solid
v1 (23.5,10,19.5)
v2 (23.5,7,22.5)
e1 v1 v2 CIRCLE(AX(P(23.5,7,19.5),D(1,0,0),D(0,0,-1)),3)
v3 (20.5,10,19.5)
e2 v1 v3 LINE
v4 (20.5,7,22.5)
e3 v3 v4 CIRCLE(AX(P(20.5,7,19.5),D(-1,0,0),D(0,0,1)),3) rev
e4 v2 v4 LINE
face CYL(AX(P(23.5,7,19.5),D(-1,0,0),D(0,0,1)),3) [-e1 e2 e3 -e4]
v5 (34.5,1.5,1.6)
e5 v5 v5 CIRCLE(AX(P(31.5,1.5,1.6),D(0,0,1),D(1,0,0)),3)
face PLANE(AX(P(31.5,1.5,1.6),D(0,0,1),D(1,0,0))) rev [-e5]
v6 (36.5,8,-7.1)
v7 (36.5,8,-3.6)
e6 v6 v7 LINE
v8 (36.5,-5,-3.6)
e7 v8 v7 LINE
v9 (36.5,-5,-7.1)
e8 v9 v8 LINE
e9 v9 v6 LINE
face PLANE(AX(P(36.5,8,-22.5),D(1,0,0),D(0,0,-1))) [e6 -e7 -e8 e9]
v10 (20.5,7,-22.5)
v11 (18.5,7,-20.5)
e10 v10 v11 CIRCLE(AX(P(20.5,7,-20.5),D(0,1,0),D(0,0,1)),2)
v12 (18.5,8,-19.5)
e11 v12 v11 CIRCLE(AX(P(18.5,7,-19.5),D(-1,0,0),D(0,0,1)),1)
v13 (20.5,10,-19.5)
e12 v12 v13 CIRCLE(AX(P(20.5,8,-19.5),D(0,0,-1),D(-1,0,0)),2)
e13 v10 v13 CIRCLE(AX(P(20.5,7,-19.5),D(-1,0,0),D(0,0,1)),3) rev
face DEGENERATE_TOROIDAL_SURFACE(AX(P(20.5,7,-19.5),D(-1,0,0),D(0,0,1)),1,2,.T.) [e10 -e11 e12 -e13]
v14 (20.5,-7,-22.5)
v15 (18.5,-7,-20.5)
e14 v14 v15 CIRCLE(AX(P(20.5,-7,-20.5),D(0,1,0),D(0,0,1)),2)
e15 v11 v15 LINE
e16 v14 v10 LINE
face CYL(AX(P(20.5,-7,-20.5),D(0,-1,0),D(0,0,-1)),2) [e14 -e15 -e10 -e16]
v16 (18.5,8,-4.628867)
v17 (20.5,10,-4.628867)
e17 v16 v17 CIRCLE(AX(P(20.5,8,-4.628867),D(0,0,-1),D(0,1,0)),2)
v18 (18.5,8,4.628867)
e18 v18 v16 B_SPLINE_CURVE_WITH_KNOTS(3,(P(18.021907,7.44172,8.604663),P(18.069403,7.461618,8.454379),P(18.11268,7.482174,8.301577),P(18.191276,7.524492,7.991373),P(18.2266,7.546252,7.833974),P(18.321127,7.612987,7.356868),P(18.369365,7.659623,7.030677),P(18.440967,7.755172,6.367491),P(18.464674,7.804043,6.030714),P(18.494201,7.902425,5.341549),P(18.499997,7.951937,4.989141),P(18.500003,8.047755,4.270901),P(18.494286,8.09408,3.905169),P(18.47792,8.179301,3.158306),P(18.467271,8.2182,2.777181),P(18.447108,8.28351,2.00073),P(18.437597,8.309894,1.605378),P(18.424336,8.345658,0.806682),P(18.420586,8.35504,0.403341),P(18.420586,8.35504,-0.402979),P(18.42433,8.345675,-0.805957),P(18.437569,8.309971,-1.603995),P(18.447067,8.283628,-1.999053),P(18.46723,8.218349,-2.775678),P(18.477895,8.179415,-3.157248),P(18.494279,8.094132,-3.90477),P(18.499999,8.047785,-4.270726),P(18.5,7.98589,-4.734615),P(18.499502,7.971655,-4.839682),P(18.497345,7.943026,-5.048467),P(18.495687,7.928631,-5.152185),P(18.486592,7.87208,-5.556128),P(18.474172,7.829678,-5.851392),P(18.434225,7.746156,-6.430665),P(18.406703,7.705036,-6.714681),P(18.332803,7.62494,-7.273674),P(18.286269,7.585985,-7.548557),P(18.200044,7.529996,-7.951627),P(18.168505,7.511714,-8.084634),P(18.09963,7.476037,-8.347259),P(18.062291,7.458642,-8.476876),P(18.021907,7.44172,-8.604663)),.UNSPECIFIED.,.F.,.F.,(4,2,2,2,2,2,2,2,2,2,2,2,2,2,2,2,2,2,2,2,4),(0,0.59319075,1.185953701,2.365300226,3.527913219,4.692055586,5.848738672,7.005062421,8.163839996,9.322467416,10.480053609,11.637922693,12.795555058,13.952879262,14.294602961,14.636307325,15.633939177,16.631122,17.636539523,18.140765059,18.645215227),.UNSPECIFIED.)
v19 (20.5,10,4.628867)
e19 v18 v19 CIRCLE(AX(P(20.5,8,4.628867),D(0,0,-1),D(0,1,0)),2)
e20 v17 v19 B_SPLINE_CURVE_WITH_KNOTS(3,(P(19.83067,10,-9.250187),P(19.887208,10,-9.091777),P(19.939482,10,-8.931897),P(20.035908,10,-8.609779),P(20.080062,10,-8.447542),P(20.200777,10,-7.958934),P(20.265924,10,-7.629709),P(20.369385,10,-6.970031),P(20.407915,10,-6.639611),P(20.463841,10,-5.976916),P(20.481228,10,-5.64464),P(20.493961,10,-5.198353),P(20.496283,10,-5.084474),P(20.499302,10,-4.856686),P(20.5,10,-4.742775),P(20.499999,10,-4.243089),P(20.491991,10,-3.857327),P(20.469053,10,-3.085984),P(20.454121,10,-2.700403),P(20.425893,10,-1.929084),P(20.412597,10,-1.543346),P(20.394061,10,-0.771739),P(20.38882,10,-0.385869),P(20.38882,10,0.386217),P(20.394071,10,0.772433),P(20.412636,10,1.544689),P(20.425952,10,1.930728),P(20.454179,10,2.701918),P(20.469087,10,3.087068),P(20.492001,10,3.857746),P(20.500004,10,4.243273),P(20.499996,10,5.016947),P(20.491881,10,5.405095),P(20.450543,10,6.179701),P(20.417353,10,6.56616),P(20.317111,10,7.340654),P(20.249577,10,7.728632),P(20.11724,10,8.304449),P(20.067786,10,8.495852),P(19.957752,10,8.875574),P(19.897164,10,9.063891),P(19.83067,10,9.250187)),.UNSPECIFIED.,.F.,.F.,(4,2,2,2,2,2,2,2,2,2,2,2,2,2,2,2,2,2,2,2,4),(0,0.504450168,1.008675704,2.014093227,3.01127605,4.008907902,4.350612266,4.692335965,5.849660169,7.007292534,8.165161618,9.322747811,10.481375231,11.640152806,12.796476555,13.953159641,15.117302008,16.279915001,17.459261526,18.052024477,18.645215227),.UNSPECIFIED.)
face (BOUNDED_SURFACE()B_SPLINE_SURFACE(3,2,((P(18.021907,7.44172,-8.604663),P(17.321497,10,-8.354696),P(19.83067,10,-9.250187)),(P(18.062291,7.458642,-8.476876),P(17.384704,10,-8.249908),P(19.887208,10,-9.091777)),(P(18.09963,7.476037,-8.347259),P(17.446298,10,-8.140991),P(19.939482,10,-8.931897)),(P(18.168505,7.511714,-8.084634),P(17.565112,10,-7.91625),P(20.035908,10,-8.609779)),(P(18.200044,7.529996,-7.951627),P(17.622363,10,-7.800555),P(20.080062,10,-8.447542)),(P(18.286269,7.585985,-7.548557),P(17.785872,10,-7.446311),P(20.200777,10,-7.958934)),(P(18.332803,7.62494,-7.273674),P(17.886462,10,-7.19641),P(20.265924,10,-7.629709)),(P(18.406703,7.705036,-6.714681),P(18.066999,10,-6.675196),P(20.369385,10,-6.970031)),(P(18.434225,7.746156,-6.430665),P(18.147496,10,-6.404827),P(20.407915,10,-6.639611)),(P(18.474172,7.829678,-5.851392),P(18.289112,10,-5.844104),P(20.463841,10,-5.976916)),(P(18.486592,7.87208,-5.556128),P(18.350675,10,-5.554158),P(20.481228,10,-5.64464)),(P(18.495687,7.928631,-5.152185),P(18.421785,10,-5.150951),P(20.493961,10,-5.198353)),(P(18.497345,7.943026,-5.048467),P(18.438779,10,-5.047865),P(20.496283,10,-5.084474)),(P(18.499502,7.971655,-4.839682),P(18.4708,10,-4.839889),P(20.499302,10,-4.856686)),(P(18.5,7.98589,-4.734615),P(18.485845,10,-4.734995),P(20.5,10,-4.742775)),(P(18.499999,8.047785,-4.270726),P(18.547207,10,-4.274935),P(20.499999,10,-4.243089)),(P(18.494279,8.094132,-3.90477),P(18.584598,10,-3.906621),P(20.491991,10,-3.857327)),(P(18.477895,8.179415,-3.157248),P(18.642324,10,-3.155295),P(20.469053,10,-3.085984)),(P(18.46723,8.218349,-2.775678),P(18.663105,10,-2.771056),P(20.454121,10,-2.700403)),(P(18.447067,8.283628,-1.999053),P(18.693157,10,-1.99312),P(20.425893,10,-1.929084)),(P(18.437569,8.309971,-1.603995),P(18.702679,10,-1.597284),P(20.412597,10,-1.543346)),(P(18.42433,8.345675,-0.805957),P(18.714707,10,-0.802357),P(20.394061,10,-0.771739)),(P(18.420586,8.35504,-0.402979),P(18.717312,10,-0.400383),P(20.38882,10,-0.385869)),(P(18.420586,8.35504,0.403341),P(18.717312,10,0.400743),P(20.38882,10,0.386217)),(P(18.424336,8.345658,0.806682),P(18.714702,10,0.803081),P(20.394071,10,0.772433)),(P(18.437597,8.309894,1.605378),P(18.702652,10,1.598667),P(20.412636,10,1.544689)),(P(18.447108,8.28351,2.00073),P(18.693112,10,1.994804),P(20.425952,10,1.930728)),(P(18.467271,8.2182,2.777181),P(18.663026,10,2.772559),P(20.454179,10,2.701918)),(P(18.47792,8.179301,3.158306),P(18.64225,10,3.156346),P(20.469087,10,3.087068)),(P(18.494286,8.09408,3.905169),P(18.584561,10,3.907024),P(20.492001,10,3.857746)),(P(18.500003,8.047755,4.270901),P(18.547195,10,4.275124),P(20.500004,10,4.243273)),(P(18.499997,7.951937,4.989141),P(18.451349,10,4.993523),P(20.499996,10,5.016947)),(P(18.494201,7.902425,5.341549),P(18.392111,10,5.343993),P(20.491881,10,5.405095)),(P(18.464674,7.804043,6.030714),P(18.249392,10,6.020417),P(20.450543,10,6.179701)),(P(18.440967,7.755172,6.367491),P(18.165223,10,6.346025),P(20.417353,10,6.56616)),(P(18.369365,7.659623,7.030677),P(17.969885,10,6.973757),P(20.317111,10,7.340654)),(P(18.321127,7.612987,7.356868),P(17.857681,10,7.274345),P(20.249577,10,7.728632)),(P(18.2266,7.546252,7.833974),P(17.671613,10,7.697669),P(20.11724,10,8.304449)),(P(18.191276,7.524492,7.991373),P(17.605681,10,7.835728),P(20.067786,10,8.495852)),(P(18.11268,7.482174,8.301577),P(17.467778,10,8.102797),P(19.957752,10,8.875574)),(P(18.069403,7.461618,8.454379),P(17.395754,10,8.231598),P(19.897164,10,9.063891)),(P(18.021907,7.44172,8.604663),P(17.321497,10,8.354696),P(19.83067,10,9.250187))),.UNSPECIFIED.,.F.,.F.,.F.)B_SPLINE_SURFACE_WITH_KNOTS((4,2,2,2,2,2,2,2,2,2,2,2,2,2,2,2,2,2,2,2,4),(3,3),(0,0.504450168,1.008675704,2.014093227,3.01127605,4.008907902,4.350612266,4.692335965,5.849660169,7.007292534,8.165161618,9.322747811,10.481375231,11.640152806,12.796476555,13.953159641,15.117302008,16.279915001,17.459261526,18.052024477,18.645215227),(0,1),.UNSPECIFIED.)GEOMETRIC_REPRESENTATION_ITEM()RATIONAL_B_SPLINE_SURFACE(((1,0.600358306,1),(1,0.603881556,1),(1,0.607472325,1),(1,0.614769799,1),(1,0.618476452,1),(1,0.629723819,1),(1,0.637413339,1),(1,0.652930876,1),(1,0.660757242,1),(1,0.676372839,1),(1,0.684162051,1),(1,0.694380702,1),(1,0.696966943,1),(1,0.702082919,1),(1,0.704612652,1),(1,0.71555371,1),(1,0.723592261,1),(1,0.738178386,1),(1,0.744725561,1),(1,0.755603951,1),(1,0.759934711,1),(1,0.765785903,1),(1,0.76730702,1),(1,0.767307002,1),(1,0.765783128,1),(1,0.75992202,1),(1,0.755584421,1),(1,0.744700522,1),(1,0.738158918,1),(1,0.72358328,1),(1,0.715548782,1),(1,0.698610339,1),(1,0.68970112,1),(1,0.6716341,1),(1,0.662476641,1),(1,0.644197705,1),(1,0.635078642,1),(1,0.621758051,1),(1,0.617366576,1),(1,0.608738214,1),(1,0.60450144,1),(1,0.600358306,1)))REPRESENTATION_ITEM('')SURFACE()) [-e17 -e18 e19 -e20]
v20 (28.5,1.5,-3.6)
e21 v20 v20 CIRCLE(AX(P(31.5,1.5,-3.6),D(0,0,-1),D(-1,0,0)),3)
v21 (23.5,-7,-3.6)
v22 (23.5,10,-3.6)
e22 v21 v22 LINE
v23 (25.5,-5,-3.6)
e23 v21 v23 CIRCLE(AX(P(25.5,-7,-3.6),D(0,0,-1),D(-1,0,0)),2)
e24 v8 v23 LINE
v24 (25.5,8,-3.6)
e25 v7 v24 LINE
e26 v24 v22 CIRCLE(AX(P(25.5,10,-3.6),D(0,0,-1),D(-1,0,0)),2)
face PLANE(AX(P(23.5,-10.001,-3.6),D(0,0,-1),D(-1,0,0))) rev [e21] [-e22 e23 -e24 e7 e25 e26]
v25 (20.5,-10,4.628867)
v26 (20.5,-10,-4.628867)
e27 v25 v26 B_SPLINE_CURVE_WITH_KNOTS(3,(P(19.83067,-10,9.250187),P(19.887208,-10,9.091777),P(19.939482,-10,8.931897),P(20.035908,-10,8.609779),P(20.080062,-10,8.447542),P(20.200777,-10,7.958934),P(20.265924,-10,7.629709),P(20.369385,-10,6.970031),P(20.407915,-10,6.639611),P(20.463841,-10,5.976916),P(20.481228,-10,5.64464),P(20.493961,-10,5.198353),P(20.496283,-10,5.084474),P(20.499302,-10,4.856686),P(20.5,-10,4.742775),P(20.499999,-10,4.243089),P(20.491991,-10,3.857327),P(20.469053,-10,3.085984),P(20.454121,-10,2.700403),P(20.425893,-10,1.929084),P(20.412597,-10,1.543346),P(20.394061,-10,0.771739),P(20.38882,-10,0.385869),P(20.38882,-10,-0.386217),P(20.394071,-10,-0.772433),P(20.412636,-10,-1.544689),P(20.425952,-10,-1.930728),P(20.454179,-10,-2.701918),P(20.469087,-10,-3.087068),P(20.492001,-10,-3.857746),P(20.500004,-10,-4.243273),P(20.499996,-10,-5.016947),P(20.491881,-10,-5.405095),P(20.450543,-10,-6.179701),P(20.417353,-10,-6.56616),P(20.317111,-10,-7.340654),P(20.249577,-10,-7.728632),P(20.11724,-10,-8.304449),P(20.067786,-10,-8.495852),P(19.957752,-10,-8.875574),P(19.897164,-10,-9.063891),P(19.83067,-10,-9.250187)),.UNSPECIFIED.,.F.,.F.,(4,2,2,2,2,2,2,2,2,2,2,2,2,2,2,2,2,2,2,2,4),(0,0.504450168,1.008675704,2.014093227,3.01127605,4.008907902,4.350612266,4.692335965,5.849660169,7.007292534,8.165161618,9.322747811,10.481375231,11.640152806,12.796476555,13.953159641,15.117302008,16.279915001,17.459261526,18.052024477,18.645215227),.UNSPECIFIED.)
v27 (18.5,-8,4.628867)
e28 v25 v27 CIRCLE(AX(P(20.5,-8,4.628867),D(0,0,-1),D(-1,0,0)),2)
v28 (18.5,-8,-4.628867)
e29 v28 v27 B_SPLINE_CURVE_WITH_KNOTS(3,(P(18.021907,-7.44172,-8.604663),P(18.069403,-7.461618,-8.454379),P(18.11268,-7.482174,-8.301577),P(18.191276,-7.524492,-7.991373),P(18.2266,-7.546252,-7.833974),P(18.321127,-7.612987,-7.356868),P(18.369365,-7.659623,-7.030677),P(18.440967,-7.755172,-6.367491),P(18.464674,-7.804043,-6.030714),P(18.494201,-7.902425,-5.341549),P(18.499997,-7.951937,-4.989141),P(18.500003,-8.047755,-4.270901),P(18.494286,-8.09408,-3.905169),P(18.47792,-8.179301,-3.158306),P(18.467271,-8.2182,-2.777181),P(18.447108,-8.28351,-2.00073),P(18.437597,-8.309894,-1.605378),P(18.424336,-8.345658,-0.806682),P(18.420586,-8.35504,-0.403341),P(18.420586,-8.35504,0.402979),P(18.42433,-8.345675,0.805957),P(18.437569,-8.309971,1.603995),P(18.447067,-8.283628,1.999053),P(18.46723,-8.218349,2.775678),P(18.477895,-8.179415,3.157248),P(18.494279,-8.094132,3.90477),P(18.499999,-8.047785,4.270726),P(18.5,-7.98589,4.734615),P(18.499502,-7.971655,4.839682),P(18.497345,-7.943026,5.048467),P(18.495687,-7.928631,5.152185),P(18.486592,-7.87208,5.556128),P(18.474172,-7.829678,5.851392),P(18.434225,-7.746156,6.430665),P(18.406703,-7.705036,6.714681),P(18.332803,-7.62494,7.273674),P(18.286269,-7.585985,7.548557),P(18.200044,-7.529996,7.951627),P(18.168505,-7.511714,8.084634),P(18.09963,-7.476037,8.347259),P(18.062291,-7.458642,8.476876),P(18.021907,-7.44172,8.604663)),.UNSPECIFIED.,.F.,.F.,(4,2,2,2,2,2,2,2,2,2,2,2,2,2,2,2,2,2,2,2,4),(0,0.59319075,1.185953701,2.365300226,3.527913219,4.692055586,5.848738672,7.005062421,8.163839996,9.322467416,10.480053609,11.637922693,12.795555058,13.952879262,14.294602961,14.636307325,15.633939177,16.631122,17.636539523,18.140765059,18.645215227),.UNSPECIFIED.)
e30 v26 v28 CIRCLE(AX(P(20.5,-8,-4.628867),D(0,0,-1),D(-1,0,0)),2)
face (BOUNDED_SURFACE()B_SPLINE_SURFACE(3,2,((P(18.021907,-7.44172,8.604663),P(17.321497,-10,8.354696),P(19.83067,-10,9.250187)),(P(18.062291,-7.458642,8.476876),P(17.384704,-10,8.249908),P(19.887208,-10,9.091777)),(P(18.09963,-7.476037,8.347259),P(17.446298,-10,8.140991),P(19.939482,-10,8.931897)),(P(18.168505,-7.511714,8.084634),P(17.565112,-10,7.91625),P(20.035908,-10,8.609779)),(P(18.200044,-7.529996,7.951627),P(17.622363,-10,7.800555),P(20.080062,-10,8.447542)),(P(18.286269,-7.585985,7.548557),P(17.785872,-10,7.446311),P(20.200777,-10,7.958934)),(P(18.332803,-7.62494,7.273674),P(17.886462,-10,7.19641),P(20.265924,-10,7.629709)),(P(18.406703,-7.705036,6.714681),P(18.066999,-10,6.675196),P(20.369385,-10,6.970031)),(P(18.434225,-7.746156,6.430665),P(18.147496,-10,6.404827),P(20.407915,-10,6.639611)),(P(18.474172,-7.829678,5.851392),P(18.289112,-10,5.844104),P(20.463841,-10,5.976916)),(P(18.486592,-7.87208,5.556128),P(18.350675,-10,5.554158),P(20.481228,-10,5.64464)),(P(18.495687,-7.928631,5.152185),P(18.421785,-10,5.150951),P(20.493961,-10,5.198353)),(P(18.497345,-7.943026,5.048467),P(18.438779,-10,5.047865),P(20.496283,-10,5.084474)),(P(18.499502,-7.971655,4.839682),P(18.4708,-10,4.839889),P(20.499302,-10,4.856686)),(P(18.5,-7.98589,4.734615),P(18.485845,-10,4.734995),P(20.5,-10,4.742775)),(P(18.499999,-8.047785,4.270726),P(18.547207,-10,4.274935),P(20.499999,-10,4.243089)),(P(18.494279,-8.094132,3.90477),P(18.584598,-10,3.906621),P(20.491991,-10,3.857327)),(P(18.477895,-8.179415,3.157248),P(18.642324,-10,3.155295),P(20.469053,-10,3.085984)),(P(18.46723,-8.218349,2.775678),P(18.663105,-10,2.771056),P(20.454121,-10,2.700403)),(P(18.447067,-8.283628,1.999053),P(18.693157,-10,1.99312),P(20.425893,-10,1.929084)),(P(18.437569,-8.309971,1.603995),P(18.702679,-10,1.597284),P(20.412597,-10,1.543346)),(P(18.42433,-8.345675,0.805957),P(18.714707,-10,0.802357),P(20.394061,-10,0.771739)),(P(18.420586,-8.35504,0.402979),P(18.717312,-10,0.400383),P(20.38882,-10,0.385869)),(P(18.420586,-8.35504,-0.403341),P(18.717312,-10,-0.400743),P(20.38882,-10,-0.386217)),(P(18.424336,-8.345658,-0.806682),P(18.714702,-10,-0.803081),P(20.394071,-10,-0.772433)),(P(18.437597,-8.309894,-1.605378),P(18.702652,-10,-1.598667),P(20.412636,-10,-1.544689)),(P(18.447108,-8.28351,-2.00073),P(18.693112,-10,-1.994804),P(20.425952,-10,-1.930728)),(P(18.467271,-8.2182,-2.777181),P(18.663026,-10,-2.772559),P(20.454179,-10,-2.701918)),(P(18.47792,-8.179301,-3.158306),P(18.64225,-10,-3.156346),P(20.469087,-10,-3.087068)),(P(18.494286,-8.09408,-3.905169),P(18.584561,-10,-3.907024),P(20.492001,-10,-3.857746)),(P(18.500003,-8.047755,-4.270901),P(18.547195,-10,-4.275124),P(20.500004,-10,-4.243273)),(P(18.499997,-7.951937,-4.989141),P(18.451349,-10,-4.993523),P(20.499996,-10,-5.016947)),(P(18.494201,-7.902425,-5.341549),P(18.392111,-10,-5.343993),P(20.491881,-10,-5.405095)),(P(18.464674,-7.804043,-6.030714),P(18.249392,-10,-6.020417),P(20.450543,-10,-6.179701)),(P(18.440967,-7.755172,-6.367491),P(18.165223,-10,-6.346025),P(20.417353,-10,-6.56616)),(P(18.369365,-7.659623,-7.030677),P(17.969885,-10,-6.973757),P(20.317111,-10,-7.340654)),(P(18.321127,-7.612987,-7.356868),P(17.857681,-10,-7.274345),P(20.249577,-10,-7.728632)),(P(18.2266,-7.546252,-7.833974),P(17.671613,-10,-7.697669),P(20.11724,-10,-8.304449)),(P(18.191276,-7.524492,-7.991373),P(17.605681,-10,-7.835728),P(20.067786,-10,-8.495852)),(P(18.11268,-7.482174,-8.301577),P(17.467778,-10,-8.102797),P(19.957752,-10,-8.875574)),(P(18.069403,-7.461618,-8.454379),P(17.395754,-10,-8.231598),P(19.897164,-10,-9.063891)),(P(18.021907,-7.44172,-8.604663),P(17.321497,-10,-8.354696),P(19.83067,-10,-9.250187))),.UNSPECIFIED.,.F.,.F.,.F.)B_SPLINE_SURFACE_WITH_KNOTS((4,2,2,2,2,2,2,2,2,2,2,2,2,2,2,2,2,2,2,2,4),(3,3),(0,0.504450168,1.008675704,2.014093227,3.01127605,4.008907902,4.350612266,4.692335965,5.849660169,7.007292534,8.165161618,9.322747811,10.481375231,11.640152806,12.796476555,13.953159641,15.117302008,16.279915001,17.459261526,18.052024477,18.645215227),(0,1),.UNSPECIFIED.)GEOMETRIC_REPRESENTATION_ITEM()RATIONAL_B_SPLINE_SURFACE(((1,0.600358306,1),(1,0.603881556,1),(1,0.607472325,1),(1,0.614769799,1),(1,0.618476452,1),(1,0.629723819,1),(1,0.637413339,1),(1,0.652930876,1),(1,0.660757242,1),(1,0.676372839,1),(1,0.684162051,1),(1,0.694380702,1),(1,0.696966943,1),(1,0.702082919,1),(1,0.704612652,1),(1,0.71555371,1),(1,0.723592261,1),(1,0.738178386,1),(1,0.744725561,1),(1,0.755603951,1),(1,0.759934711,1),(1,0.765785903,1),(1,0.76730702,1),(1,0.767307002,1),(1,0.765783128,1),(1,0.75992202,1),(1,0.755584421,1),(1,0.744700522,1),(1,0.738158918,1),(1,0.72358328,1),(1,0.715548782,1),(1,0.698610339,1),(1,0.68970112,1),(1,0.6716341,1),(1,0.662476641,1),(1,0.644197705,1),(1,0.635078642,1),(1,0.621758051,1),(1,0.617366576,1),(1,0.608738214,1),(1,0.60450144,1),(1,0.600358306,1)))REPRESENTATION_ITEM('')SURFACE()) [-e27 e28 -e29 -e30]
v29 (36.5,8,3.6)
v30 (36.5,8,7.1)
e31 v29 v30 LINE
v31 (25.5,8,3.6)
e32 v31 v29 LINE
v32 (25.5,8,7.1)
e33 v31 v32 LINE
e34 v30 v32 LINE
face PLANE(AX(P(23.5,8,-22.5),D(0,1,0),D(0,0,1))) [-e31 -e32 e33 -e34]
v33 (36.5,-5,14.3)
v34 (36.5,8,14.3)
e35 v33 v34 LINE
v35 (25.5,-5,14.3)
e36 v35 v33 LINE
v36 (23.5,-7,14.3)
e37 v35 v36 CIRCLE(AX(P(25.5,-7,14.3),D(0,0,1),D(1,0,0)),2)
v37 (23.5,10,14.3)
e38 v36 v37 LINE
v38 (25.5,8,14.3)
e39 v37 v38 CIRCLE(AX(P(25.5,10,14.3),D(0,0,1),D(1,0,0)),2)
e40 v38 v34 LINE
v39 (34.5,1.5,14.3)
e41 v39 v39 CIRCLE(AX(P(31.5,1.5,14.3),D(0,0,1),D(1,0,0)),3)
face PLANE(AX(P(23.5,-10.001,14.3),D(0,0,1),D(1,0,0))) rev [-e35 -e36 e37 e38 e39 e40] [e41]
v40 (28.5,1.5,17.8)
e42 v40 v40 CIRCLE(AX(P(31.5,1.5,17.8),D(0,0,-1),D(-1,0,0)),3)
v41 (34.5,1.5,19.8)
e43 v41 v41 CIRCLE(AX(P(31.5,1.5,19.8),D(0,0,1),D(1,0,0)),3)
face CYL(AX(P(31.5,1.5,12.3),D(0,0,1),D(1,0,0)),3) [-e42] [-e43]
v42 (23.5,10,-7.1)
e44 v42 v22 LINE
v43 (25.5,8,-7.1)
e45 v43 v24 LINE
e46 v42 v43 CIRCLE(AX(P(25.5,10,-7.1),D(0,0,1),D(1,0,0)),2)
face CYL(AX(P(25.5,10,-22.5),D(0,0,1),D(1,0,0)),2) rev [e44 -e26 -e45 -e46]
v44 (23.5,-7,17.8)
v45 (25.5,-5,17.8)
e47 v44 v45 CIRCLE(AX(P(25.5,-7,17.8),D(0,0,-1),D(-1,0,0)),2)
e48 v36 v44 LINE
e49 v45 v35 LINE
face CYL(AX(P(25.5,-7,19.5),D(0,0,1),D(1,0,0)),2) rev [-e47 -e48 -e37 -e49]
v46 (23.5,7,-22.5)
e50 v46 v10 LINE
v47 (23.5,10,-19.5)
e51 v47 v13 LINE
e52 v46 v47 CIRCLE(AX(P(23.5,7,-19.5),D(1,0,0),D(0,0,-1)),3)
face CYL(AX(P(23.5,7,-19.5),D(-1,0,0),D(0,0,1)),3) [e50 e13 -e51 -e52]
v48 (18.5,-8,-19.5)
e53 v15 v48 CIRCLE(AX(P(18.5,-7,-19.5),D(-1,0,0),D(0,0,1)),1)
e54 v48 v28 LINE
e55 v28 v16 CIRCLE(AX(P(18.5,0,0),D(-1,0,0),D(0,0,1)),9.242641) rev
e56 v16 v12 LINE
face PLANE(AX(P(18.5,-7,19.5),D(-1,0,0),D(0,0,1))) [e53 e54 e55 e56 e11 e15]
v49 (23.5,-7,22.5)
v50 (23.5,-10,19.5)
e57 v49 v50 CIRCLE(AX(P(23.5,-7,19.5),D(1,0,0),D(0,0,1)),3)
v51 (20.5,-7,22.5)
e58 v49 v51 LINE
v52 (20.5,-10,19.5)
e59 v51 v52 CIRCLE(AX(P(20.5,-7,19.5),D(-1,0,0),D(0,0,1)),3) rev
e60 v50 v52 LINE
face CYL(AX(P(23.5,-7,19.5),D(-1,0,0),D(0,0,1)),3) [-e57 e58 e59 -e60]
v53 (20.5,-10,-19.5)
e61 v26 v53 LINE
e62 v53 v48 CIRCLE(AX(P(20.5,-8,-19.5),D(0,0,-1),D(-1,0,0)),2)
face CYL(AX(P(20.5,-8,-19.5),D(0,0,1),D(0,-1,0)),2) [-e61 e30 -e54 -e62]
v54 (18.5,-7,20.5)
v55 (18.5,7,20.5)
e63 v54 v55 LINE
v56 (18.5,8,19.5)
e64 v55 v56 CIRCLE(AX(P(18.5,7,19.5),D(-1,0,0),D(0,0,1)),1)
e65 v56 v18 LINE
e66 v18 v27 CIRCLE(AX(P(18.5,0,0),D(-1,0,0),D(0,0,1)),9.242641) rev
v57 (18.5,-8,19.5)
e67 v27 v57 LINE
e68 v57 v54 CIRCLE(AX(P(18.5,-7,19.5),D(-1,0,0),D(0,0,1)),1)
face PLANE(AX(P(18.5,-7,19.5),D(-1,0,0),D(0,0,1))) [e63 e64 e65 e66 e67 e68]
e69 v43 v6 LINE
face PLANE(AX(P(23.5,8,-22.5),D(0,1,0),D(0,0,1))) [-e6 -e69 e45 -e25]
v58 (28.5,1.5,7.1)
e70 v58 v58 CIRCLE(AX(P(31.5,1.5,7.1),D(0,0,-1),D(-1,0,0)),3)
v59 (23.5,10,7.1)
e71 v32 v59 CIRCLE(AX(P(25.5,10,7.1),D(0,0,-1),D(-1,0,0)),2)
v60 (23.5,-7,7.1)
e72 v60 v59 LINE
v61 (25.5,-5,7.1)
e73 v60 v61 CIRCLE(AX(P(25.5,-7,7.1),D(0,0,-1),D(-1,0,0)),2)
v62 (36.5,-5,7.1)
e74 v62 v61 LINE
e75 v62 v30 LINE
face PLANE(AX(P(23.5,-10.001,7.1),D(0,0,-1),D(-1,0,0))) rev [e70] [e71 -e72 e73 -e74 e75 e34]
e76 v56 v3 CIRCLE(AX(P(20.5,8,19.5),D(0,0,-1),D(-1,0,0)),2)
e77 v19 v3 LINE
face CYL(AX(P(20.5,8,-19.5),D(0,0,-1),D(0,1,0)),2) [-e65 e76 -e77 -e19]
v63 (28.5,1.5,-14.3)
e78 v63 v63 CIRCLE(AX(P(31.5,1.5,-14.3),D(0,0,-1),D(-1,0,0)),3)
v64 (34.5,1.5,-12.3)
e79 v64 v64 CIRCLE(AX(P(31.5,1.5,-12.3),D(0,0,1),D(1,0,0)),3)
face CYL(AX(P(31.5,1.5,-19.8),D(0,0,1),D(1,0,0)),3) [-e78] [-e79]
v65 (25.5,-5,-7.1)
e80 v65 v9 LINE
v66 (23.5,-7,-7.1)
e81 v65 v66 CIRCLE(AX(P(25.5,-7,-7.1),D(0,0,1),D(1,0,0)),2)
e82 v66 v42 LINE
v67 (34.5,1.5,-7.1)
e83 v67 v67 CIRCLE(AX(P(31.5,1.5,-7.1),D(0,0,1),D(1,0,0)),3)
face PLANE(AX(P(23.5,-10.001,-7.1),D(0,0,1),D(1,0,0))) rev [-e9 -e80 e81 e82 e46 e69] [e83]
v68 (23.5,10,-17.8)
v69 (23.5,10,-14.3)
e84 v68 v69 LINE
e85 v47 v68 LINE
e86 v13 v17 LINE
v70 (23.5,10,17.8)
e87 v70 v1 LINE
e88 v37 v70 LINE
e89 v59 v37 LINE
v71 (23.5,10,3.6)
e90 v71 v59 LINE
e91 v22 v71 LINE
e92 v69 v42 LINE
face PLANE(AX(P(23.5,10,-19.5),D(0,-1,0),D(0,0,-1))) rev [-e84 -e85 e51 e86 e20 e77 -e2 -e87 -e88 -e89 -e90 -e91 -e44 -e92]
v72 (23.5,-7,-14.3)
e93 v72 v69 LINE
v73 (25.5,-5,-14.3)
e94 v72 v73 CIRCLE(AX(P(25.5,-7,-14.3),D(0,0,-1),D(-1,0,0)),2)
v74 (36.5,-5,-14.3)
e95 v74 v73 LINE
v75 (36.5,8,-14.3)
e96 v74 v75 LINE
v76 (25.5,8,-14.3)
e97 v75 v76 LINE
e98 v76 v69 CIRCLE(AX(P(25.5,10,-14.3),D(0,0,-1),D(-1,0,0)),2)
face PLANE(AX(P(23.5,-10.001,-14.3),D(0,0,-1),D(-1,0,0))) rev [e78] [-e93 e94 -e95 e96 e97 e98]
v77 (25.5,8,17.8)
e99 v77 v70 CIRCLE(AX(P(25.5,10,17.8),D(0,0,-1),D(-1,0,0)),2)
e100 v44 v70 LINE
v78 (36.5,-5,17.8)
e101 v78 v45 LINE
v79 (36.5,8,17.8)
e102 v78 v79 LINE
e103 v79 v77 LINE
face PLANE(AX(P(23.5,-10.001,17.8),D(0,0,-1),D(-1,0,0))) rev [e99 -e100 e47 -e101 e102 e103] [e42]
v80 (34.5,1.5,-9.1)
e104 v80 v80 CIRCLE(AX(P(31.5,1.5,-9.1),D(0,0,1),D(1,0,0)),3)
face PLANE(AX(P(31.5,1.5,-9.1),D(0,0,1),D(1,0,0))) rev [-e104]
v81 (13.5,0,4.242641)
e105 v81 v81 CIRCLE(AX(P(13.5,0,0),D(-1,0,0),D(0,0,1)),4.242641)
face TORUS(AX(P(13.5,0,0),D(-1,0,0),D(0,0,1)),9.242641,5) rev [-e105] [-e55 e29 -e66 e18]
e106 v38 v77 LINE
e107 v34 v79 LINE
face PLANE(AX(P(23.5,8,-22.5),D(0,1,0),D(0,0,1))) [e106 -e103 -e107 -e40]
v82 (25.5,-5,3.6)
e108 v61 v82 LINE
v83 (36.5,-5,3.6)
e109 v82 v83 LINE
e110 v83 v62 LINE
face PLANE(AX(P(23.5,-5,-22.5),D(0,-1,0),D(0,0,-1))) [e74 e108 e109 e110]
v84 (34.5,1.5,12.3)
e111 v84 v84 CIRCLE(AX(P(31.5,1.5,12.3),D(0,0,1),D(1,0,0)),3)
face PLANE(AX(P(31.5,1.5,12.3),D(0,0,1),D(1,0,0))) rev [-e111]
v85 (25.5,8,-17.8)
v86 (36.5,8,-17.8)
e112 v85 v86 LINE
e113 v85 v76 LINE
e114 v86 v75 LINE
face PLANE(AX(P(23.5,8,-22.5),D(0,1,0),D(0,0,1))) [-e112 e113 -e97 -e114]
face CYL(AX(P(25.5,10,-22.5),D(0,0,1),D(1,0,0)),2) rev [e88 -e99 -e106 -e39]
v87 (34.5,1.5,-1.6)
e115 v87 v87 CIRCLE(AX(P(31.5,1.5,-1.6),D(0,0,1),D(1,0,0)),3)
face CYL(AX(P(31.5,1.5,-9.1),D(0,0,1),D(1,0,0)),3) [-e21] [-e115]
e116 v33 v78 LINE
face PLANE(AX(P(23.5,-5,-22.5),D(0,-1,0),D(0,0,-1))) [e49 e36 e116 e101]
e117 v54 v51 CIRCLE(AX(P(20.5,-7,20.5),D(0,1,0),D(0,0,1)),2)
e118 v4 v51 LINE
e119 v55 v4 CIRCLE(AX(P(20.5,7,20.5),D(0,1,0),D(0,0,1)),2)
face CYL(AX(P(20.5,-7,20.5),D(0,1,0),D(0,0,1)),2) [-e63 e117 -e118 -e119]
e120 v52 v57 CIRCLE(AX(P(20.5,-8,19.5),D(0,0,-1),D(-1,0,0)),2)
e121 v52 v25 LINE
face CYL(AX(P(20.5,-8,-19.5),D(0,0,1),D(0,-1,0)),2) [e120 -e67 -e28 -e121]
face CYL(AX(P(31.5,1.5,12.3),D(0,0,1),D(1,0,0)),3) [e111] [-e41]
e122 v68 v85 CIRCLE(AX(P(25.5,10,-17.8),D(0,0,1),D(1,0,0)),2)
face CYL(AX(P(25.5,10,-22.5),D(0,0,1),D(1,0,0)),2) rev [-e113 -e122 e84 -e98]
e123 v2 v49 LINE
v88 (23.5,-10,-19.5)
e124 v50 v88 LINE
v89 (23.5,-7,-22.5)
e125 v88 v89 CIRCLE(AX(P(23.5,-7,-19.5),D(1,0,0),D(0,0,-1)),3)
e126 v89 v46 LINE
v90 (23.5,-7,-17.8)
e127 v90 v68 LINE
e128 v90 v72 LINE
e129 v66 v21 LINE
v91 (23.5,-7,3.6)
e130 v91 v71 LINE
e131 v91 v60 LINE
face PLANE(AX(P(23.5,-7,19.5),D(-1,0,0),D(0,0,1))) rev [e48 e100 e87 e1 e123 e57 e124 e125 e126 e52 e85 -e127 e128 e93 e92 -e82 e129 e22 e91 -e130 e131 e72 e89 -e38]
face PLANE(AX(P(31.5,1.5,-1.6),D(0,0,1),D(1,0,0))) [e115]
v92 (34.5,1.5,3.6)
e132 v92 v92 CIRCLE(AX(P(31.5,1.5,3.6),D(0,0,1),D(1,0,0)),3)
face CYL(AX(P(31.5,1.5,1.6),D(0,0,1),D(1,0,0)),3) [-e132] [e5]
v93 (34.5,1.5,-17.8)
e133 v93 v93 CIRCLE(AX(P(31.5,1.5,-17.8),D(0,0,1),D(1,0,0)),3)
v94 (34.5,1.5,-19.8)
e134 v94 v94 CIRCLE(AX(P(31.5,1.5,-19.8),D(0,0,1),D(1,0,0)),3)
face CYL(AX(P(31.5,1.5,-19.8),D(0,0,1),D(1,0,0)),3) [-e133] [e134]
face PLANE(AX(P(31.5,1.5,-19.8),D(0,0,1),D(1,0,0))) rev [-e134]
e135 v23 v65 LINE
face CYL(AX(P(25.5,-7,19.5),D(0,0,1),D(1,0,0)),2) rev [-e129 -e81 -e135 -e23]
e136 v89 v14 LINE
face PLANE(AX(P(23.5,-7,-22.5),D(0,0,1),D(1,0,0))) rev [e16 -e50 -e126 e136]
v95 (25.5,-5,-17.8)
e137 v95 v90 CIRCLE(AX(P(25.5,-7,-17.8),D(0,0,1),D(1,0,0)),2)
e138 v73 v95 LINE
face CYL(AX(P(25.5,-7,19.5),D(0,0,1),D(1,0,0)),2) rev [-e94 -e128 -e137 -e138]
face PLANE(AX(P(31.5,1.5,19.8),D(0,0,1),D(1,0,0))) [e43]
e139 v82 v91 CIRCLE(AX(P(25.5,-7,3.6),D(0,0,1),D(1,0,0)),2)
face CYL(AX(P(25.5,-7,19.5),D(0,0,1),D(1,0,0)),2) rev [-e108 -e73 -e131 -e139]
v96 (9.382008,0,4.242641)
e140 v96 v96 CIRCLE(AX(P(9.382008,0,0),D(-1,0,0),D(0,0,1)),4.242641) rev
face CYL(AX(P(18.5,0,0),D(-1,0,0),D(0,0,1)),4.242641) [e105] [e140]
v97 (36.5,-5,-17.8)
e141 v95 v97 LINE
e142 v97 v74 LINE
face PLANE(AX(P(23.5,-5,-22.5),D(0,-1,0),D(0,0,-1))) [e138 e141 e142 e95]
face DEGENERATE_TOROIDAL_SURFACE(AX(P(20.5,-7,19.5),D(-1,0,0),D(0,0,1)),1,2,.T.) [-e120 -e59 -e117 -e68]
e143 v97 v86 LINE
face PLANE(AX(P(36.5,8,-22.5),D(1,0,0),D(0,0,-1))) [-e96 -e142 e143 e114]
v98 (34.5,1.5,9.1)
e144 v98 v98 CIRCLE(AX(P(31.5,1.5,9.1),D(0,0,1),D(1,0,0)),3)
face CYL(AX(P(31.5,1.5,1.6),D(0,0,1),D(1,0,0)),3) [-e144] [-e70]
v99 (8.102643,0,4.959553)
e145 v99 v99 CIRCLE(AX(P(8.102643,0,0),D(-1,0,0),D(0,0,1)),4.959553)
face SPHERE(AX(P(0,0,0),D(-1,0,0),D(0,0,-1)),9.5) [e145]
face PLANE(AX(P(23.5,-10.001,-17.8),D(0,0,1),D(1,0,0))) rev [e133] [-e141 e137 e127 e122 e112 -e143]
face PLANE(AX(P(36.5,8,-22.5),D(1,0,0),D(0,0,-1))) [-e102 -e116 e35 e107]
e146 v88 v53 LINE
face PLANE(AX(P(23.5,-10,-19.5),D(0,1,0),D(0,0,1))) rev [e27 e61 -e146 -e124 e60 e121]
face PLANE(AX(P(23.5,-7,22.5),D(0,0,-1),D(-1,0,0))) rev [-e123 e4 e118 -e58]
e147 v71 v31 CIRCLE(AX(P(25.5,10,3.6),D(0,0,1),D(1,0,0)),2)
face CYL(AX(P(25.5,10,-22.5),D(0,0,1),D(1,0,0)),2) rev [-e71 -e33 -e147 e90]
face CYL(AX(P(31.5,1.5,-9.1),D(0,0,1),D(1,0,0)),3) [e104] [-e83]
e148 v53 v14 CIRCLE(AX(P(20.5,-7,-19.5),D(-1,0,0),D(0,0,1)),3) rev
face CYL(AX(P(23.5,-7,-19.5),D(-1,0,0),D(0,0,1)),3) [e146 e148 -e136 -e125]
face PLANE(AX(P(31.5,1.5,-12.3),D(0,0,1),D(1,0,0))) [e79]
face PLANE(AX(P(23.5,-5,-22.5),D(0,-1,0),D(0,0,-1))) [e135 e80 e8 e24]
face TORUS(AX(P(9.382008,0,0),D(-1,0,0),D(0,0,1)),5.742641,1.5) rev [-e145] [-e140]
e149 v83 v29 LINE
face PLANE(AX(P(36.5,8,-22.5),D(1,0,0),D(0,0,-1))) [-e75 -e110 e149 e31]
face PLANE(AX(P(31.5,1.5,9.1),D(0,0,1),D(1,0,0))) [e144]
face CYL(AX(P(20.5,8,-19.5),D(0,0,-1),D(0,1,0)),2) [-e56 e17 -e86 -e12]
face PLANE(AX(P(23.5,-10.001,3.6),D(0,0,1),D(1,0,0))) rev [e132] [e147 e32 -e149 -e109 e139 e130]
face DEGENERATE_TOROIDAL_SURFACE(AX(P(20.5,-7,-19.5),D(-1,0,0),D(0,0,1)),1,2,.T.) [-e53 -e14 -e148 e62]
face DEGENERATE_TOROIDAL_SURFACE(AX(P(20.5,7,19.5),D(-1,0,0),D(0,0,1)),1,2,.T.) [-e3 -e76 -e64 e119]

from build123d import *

# Parameters (mm, degrees)
SKETCH3_R                = 4.242640687
BOSS_EXTRUDE1_DEPTH      = 10
FILLET1_R                = 1.5
BOSS_EXTRUDE2_DEPTH      = 5
FILLET2_R                = 5
SKETCH5_W                = 13
SKETCH5_H                = 13
BOSS_EXTRUDE3_DEPTH      = 45
CUT_EXTRUDE4_REACH       = 48.503
SKETCH6_W                = 13
SKETCH6_H                = 4.7
SKETCH6_H_2              = 7.2
BOSS_EXTRUDE4_DEPTH      = 2
BOSS_EXTRUDE4_DEPTH_BACK = 5.5
SKETCH9_R                = 3
BOSS_EXTRUDE5_DEPTH      = 2
BOSS_EXTRUDE5_DEPTH_BACK = 5.5
SKETCH10_R               = 3
BOSS_EXTRUDE6_DEPTH      = 2
BOSS_EXTRUDE6_DEPTH_BACK = 5.5
SKETCH12_R               = 3
BOSS_EXTRUDE7_DEPTH      = 2
BOSS_EXTRUDE7_DEPTH_BACK = 5.5
SKETCH14_R               = 3
FILLET4_R                = 2
FILLET8_R                = 2


with BuildPart() as part:
    # Sketch1 → Revolve1 (revolve)
    with BuildSketch(Plane(origin=(0, 0, 0), x_dir=(1, 0, 0), z_dir=(0, 1, 0))):
        with BuildLine():
            Line((-9.5, 0), (8.5, 0))
            Line((8.5, 0), (8.5, 4.242640687))
            ThreePointArc((8.5, 4.242640687), (-2.179449472, 9.246621004), (-9.5, 0))
        make_face()
    revolve(axis=Axis((-9.5, 0, 0), (1, 0, 0)))

    # Sketch3 → Boss-Extrude1 (add)
    with BuildSketch(Plane(origin=(8.5, 0, 0), x_dir=(0, 0, -1), z_dir=(1, 0, 0))):
        Circle(SKETCH3_R)
    extrude(amount=BOSS_EXTRUDE1_DEPTH)

    # Fillet1
    fillet1_edges = [part.edges().sort_by_distance(p)[0] for p in [
        (8.5, 0, 4.242640687),
    ]]
    fillet(fillet1_edges, radius=FILLET1_R)

    # Sketch4 → Boss-Extrude2 (add)
    with BuildSketch(Plane(origin=(18.5, 0, 0), x_dir=(0, 0, -1), z_dir=(1, 0, 0))):
        with BuildLine():
            Line((19.5, -10), (-19.5, -10))
            ThreePointArc((-19.5, -10), (-21.621320344, -9.121320344), (-22.5, -7))
            Line((-22.5, -7), (-22.5, 7))
            ThreePointArc((-22.5, 7), (-21.621320344, 9.121320344), (-19.5, 10))
            Line((-19.5, 10), (19.5, 10))
            ThreePointArc((19.5, 10), (21.621320344, 9.121320344), (22.5, 7))
            Line((22.5, 7), (22.5, -7))
            ThreePointArc((22.5, -7), (21.621320344, -9.121320344), (19.5, -10))
        make_face()
    extrude(amount=BOSS_EXTRUDE2_DEPTH)

    # Fillet2
    fillet2_edges = [part.edges().sort_by_distance(p)[0] for p in [
        (18.5, 0, 4.242640687),
    ]]
    fillet(fillet2_edges, radius=FILLET2_R)

    # Sketch5 → Boss-Extrude3 (add, through all)
    with BuildSketch(Plane.XY.offset(22.5)):
        with Locations((30, 1.5)):
            Rectangle(SKETCH5_W, SKETCH5_H)
    extrude(amount=-BOSS_EXTRUDE3_DEPTH)

    # Sketch6 → Cut-Extrude4 (cut, up to next)
    with BuildSketch(Plane(origin=(0, 8, 0), x_dir=(1, 0, 0), z_dir=(0, 1, 0)), mode=Mode.PRIVATE) as cut_extrude4_sk1:
        with Locations((30, -20.15)):
            Rectangle(SKETCH6_W, SKETCH6_H)
    cut_extrude4_tool1 = extrude(cut_extrude4_sk1.sketch, amount=-CUT_EXTRUDE4_REACH, mode=Mode.PRIVATE) & part.part
    # Sketch6 → Cut-Extrude4 (cut, up to next)
    with BuildSketch(Plane(origin=(0, 8, 0), x_dir=(1, 0, 0), z_dir=(0, 1, 0)), mode=Mode.PRIVATE) as cut_extrude4_sk2:
        with Locations((30, -10.7)):
            Rectangle(SKETCH6_W, SKETCH6_H_2)
    cut_extrude4_tool2 = extrude(cut_extrude4_sk2.sketch, amount=-CUT_EXTRUDE4_REACH, mode=Mode.PRIVATE) & part.part
    # Sketch6 → Cut-Extrude4 (cut, up to next)
    with BuildSketch(Plane(origin=(0, 8, 0), x_dir=(1, 0, 0), z_dir=(0, 1, 0)), mode=Mode.PRIVATE) as cut_extrude4_sk3:
        with Locations((30, 0)):
            Rectangle(SKETCH6_W, SKETCH6_H_2)
    cut_extrude4_tool3 = extrude(cut_extrude4_sk3.sketch, amount=-CUT_EXTRUDE4_REACH, mode=Mode.PRIVATE) & part.part
    # Sketch6 → Cut-Extrude4 (cut, up to next)
    with BuildSketch(Plane(origin=(0, 8, 0), x_dir=(1, 0, 0), z_dir=(0, 1, 0)), mode=Mode.PRIVATE) as cut_extrude4_sk4:
        with Locations((30, 10.7)):
            Rectangle(SKETCH6_W, SKETCH6_H_2)
    cut_extrude4_tool4 = extrude(cut_extrude4_sk4.sketch, amount=-CUT_EXTRUDE4_REACH, mode=Mode.PRIVATE) & part.part
    # Sketch6 → Cut-Extrude4 (cut, up to next)
    with BuildSketch(Plane(origin=(0, 8, 0), x_dir=(1, 0, 0), z_dir=(0, 1, 0)), mode=Mode.PRIVATE) as cut_extrude4_sk5:
        with Locations((30, 20.15)):
            Rectangle(SKETCH6_W, SKETCH6_H)
    cut_extrude4_tool5 = extrude(cut_extrude4_sk5.sketch, amount=-CUT_EXTRUDE4_REACH, mode=Mode.PRIVATE) & part.part
    add(cut_extrude4_tool1.solids().sort_by_distance((30, 8, 20.15))[0], mode=Mode.SUBTRACT)
    add(cut_extrude4_tool2.solids().sort_by_distance((30, 8, 10.7))[0], mode=Mode.SUBTRACT)
    add(cut_extrude4_tool3.solids().sort_by_distance((30, 8, 0))[0], mode=Mode.SUBTRACT)
    add(cut_extrude4_tool4.solids().sort_by_distance((30, 8, -10.7))[0], mode=Mode.SUBTRACT)
    add(cut_extrude4_tool5.solids().sort_by_distance((30, 8, -20.15))[0], mode=Mode.SUBTRACT)

    # Sketch9 → Boss-Extrude4 (add, two sides: drawn at the far end of the back side and taken through both)
    with BuildSketch(Plane.XY.offset(17.8).offset(-BOSS_EXTRUDE4_DEPTH_BACK)):
        with Locations((31.5, 1.5)):
            Circle(SKETCH9_R)
    extrude(amount=BOSS_EXTRUDE4_DEPTH + BOSS_EXTRUDE4_DEPTH_BACK)

    # Sketch10 → Boss-Extrude5 (add, two sides: drawn at the far end of the back side and taken through both)
    with BuildSketch(Plane.XY.offset(7.1).offset(-BOSS_EXTRUDE5_DEPTH_BACK)):
        with Locations((31.5, 1.5)):
            Circle(SKETCH10_R)
    extrude(amount=BOSS_EXTRUDE5_DEPTH + BOSS_EXTRUDE5_DEPTH_BACK)

    # Sketch12 → Boss-Extrude6 (add, two sides: drawn at the far end of the back side and taken through both)
    with BuildSketch(Plane.XY.offset(-3.6).offset(-BOSS_EXTRUDE6_DEPTH_BACK)):
        with Locations((31.5, 1.5)):
            Circle(SKETCH12_R)
    extrude(amount=BOSS_EXTRUDE6_DEPTH + BOSS_EXTRUDE6_DEPTH_BACK)

    # Sketch14 → Boss-Extrude7 (add, two sides: drawn at the far end of the back side and taken through both)
    with BuildSketch(Plane.XY.offset(-14.3).offset(-BOSS_EXTRUDE7_DEPTH_BACK)):
        with Locations((31.5, 1.5)):
            Circle(SKETCH14_R)
    extrude(amount=BOSS_EXTRUDE7_DEPTH + BOSS_EXTRUDE7_DEPTH_BACK)

    # Fillet4
    fillet4_edges = [part.edges().sort_by_distance(p)[0] for p in [
        (23.5, -5, -16.05),
        (23.5, -5, -5.35),
        (23.5, -5, 5.35),
        (23.5, -5, 16.05),
        (23.5, 8, -16.05),
        (23.5, 8, -5.35),
        (23.5, 8, 5.35),
        (23.5, 8, 16.05),
    ]]
    fillet(fillet4_edges, radius=FILLET4_R - 0.0001)  # a hair under: the kernel refuses the full size

    # Fillet8
    fillet8_edges = [part.edges().sort_by_distance(p)[0] for p in [
        (18.5, -9.121320344, 21.621320344),
        (18.5, -10, 0),
        (18.5, -9.121320344, -21.621320344),
        (18.5, 0, -22.5),
        (18.5, 9.121320344, -21.621320344),
        (18.5, 10, 0),
        (18.5, 9.121320344, 21.621320344),
        (18.5, 0, 22.5),
    ]]
    fillet(fillet8_edges, radius=FILLET8_R)


solid = part.part
